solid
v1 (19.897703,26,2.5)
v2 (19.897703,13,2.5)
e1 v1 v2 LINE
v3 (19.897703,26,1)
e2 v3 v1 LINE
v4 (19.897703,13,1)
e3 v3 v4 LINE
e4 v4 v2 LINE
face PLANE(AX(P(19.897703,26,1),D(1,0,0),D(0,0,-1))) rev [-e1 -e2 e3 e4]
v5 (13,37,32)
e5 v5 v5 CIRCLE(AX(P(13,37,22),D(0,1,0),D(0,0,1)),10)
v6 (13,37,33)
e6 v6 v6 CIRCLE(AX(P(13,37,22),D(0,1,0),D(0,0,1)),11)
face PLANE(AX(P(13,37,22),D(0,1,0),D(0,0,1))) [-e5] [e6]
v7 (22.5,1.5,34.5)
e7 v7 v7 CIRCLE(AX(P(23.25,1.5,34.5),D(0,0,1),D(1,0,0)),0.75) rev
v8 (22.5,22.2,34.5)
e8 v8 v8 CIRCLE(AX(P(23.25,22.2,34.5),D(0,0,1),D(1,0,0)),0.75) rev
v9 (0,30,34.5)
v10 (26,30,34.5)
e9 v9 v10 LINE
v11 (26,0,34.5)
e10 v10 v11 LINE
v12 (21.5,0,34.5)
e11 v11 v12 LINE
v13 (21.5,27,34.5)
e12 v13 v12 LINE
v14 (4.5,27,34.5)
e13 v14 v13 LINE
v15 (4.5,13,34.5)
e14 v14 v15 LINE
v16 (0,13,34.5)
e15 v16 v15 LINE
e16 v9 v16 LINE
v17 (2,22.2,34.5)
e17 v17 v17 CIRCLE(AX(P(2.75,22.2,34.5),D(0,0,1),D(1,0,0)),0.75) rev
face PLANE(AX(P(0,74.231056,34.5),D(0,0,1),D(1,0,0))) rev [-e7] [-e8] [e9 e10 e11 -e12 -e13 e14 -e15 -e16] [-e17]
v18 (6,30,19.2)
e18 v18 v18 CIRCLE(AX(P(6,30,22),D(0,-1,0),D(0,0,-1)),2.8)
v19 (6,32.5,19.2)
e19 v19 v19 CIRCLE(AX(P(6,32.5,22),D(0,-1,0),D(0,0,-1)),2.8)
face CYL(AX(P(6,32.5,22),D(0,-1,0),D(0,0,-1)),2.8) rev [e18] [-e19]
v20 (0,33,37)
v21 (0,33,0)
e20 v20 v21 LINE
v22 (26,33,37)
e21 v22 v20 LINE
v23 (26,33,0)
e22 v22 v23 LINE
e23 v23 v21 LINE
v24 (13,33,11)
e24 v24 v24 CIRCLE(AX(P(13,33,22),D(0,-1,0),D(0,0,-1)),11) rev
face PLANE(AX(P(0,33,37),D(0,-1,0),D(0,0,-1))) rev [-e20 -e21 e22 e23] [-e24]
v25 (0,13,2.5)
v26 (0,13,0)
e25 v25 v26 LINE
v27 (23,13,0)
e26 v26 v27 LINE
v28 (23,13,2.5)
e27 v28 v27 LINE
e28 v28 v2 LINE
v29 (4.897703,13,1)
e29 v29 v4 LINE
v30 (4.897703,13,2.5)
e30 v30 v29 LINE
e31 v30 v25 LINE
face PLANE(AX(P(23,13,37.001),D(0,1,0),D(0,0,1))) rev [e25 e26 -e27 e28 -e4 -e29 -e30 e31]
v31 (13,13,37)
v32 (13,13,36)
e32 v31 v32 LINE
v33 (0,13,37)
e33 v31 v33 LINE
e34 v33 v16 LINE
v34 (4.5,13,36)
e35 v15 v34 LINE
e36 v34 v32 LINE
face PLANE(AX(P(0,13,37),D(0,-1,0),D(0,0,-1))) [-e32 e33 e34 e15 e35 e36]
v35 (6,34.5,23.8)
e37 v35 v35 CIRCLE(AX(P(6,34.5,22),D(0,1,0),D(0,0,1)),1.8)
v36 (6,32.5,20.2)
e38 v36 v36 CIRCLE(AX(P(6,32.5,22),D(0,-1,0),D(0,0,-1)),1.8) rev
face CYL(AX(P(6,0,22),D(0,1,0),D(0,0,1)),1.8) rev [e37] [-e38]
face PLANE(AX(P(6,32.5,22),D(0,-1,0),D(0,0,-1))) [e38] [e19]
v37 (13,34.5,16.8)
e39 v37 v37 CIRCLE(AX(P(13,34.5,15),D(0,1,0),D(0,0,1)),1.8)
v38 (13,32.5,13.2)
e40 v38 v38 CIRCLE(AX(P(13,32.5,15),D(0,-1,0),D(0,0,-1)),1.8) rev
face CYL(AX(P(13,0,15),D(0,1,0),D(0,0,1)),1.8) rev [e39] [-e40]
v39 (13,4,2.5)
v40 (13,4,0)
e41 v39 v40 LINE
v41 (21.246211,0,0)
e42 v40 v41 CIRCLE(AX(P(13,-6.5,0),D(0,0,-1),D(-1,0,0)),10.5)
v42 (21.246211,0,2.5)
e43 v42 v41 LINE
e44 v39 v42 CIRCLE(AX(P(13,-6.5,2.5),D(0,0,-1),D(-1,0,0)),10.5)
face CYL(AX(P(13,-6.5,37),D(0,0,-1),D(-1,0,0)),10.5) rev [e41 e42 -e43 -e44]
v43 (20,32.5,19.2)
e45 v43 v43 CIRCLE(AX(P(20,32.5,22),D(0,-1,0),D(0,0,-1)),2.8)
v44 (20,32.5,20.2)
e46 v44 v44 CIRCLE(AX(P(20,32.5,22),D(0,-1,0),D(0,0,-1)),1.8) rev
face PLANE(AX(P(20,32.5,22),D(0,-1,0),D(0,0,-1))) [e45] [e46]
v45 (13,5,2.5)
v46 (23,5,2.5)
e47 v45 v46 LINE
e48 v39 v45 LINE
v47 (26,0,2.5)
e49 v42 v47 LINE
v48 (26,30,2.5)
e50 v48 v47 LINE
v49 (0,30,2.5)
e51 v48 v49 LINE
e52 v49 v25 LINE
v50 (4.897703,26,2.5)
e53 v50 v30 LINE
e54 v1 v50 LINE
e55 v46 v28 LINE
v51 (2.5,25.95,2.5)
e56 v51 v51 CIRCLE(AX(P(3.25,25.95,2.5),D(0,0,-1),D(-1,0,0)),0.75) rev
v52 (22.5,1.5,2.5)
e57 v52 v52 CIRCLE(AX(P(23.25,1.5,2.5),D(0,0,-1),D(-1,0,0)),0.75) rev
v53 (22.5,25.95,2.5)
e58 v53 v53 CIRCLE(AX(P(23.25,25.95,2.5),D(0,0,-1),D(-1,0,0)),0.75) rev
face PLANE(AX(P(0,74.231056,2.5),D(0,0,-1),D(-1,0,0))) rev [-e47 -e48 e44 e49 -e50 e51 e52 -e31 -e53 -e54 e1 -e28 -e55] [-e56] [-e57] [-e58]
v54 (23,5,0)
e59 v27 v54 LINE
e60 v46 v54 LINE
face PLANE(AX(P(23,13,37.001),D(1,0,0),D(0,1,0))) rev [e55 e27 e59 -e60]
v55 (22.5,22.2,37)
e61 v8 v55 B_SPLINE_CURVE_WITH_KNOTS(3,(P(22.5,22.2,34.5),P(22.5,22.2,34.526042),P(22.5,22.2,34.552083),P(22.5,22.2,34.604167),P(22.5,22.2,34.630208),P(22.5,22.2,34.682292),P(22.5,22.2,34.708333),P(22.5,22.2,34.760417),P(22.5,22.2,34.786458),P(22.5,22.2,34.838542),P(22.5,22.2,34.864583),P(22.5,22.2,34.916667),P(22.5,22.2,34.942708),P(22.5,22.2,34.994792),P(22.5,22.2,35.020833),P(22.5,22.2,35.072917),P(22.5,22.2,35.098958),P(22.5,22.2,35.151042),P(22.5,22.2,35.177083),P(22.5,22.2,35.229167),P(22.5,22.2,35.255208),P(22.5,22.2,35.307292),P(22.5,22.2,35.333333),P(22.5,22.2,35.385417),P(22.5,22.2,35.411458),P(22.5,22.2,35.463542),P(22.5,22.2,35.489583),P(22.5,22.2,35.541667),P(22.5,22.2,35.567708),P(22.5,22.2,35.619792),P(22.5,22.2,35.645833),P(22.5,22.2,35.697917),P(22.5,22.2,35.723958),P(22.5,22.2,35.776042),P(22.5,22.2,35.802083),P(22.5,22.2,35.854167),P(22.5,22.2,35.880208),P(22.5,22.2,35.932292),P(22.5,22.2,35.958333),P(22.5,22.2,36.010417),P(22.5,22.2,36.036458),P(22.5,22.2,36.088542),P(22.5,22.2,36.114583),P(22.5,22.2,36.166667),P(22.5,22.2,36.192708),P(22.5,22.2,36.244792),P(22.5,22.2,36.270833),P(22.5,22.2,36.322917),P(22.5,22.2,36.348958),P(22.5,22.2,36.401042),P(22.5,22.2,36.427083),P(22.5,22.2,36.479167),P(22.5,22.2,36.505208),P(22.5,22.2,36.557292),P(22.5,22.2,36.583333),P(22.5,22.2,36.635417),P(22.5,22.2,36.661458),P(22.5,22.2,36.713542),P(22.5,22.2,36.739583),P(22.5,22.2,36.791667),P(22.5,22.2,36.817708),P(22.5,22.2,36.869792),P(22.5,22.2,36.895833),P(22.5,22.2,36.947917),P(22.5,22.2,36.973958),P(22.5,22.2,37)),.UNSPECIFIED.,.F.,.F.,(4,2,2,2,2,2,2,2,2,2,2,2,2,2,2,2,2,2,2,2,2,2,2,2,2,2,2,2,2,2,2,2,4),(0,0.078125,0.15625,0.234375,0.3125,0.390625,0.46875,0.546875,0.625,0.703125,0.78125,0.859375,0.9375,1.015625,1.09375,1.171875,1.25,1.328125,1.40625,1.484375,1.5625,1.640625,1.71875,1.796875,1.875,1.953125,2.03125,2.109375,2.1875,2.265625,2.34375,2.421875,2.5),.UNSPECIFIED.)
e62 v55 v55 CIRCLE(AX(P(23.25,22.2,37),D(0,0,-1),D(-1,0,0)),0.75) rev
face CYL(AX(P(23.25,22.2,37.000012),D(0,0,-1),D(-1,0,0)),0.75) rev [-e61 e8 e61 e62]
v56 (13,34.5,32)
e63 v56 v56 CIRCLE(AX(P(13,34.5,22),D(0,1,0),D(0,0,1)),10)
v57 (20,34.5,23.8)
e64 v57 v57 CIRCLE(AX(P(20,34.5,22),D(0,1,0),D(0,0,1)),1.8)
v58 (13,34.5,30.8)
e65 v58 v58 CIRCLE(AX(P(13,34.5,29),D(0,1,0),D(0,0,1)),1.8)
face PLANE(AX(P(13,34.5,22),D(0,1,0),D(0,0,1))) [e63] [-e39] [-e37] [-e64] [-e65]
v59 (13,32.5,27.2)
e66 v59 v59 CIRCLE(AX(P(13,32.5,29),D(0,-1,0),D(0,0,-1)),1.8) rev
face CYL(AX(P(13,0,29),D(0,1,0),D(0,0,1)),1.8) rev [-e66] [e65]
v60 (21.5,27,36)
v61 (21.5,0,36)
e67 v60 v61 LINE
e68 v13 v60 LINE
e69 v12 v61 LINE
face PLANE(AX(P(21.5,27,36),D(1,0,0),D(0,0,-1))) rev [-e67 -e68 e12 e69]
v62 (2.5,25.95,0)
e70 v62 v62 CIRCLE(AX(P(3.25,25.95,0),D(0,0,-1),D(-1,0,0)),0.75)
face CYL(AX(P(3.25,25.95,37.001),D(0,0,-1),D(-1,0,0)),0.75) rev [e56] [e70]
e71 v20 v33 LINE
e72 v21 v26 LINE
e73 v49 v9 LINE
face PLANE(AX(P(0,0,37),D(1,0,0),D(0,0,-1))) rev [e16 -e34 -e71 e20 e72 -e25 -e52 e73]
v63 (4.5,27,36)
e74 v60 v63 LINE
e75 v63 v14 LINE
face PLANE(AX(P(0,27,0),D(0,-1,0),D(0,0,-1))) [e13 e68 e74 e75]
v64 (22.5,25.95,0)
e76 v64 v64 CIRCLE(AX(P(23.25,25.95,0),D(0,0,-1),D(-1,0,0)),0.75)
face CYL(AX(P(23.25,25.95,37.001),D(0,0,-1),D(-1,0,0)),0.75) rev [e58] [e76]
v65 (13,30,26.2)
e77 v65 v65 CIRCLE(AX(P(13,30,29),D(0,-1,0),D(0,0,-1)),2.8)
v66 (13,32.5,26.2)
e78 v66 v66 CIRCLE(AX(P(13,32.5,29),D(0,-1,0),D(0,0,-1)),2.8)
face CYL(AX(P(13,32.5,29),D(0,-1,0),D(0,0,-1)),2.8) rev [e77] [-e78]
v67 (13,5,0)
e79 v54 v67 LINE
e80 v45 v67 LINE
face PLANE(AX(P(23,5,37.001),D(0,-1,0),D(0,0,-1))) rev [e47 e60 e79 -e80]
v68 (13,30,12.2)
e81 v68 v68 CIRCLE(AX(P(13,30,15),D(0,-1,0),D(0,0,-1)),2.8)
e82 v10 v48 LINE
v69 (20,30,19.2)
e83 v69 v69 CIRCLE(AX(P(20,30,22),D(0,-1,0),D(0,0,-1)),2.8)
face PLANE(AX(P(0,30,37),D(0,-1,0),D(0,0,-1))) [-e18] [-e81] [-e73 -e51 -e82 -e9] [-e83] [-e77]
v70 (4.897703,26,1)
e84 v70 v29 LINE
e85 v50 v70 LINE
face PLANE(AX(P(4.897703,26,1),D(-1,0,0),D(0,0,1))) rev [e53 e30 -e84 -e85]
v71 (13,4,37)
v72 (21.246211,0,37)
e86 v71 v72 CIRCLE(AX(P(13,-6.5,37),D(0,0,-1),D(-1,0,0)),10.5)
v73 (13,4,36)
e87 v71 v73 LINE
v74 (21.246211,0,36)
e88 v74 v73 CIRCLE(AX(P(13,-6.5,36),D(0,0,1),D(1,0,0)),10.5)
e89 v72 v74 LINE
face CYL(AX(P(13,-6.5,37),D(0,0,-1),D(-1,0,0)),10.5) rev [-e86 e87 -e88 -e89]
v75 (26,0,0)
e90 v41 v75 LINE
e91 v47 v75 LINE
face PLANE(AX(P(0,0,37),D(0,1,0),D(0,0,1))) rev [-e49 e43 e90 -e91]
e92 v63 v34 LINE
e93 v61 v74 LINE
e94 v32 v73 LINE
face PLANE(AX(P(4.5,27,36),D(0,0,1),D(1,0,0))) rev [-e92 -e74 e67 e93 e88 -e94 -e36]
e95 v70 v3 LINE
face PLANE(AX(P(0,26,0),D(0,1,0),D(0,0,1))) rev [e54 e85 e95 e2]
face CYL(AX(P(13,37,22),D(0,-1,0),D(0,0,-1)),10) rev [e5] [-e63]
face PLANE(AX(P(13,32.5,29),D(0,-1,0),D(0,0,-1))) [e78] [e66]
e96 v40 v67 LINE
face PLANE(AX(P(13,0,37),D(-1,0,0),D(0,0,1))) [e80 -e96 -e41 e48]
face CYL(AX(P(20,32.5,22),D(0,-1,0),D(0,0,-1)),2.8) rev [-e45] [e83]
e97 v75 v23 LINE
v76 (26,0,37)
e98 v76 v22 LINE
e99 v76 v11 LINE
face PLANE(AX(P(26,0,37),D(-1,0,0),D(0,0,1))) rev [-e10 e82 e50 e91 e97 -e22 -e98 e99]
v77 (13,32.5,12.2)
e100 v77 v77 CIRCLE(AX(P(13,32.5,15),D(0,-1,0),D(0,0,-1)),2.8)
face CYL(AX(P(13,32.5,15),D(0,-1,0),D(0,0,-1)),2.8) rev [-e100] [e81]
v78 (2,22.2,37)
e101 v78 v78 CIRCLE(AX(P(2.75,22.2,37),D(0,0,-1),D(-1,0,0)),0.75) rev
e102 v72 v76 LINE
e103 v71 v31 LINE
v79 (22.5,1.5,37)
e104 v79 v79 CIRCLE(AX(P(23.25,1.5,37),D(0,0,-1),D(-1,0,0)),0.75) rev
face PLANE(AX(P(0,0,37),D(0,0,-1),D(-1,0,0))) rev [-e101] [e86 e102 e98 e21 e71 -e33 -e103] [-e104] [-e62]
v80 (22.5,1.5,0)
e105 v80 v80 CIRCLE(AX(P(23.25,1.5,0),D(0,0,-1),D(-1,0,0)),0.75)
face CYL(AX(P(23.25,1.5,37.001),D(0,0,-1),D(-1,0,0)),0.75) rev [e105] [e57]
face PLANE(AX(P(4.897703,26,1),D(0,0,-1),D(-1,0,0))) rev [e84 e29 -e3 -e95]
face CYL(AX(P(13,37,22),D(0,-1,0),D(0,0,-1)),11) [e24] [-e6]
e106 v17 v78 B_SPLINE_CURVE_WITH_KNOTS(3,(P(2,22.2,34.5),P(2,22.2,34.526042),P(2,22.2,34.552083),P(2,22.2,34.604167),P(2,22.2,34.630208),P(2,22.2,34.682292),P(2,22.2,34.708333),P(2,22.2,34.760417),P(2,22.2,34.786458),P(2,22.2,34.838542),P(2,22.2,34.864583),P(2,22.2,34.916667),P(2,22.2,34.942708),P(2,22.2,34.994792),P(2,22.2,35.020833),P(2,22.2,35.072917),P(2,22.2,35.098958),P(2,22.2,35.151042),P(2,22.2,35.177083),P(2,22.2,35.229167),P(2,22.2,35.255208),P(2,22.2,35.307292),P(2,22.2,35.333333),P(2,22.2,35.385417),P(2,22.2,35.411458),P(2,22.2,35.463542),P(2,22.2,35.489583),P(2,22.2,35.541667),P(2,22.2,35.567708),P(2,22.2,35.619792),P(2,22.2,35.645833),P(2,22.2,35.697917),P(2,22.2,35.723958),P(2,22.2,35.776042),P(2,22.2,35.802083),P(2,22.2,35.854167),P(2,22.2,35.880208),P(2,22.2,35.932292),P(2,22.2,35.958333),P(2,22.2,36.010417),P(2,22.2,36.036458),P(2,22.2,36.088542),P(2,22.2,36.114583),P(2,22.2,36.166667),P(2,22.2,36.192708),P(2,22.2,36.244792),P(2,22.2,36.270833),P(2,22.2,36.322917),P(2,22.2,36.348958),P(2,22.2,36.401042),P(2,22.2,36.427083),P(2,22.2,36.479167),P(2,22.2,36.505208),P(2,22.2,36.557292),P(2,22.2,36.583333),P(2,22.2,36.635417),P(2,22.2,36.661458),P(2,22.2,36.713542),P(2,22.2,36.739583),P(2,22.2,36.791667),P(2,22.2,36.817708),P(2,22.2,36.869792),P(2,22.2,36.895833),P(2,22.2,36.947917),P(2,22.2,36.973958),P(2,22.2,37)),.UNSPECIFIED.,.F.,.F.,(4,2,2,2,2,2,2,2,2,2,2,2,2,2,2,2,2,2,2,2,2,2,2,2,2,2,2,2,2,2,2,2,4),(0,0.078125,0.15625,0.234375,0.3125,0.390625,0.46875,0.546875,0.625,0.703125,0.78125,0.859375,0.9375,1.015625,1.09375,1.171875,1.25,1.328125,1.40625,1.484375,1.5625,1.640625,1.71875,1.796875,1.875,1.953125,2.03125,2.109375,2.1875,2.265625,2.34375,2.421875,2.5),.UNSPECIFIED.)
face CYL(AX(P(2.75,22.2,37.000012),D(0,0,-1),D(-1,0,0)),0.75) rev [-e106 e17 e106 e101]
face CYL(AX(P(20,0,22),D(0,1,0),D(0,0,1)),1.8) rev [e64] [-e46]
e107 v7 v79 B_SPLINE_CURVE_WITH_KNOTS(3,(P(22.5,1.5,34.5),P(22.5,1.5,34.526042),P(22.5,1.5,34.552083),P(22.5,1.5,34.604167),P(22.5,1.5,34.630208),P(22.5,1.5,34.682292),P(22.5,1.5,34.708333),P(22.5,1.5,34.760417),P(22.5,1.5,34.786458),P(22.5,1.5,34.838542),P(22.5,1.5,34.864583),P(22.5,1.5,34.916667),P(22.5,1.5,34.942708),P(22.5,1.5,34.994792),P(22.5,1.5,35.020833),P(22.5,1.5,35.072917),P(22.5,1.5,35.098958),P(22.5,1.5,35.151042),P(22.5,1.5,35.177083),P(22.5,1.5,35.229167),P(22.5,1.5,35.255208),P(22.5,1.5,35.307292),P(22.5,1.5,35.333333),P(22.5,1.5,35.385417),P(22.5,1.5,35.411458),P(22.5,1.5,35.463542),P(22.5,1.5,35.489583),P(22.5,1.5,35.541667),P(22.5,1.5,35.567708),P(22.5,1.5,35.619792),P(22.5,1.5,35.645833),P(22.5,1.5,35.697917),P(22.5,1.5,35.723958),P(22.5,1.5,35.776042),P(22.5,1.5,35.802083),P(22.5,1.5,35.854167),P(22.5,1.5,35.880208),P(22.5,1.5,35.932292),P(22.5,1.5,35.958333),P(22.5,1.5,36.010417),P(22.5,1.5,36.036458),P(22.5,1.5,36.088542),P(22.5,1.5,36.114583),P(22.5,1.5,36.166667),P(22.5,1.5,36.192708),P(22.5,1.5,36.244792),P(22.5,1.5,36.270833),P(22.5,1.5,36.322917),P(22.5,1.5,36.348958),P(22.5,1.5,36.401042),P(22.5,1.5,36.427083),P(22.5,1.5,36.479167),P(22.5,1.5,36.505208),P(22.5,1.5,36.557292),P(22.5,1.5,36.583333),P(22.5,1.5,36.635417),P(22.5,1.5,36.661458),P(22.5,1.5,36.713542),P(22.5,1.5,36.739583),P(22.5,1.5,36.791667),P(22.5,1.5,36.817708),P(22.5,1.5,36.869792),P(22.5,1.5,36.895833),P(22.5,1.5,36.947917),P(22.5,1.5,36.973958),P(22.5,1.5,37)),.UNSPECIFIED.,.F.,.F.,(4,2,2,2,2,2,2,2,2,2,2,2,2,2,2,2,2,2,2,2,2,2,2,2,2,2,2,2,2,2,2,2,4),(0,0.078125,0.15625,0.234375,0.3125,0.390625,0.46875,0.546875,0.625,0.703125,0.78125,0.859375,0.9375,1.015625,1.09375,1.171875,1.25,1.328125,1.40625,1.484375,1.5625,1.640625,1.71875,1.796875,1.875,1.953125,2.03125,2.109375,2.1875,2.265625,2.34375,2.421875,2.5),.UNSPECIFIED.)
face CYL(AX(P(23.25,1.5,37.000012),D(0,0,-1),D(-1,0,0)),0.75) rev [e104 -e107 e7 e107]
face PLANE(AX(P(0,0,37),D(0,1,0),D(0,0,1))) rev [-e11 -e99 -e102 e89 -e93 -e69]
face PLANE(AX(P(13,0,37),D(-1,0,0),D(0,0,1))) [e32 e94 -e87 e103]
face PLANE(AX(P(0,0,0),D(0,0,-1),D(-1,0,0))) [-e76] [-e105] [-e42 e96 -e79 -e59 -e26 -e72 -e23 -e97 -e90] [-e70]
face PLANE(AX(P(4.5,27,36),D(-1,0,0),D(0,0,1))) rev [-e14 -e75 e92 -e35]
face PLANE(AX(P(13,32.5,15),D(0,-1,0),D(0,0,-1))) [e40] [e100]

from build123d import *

# Parameters (mm, degrees)
SKETCH_1_W                      = 26
SKETCH_1_H                      = 33
EXTRUDE_1_DEPTH                 = 37
SKETCH_3_W                      = 26
SKETCH_3_H                      = 32
CUT_EXTRUDE_1_DEPTH             = 30
CUT_EXTRUDE_2_REACH             = 57.982
SKETCH_2_R                      = 0.75
CUT_EXTRUDE_2_DIRECTION_2_DEPTH = 56.982140009
CUT_EXTRUDE_3_REACH             = 57.982
SKETCH_4_R                      = 0.75
SKETCH_5_W                      = 17
SKETCH_5_H                      = 1.5
CUT_EXTRUDE_4_DEPTH             = 27
CUT_EXTRUDE_5_REACH             = 57.982
SKETCH_6_W                      = 20
SKETCH_6_H                      = 8
CUT_EXTRUDE_START               = -37
CUT_EXTRUDE_6_OUTLINE_R         = 0.75
CUT_EXTRUDE_6_DEPTH             = 37
SKETCH_8_W                      = 15
SKETCH_8_H                      = 1.5
CUT_EXTRUDE_7_DEPTH             = 13
SKETCH_9_R                      = 11
SKETCH_9_R_2                    = 10
EXTRUDE_2_DEPTH                 = 4
SKETCH_12_R                     = 10
EXTRUDE_3_DEPTH                 = 1.5
CUT_EXTRUDE_8_DEPTH             = 56.982140009
CUT_EXTRUDE_8_DEPTH_BACK        = 56.982140009
SKETCH_10_R                     = 1.8
SKETCH_11_R                     = 2.8
CUT_EXTRUDE_9_DEPTH             = 2.5


# Read off the part's stored shape, not the designer's step: 切除-拉伸6
with BuildPart() as part:
    # 草图1 → 凸台-拉伸1 (new body)
    with BuildSketch(Plane.XY):
        with Locations((13, 16.5)):
            Rectangle(SKETCH_1_W, SKETCH_1_H)
    extrude(amount=EXTRUDE_1_DEPTH)

    # 草图3 → 切除-拉伸1 (cut)
    with BuildSketch(Plane.XZ):
        with Locations((13, 18.5)):
            Rectangle(SKETCH_3_W, SKETCH_3_H)
    extrude(amount=-CUT_EXTRUDE_1_DEPTH, mode=Mode.SUBTRACT)

    # 草图2 → 切除-拉伸2 (cut, up to next)
    with BuildSketch(Plane.XY.offset(37), mode=Mode.PRIVATE) as cut_extrude_2_sk1:
        with Locations(Location((2.75, 1.5, 0), (0, 0, 180))):
            Circle(SKETCH_2_R)
    cut_extrude_2_tool1 = extrude(cut_extrude_2_sk1.sketch, amount=-CUT_EXTRUDE_2_REACH, mode=Mode.PRIVATE) & part.part
    # 草图2 → 切除-拉伸2 (cut, up to next)
    with BuildSketch(Plane.XY.offset(37), mode=Mode.PRIVATE) as cut_extrude_2_sk2:
        with Locations(Location((23.25, 1.5, 0), (0, 0, 180))):
            Circle(SKETCH_2_R)
    cut_extrude_2_tool2 = extrude(cut_extrude_2_sk2.sketch, amount=-CUT_EXTRUDE_2_REACH, mode=Mode.PRIVATE) & part.part
    # 草图2 → 切除-拉伸2 (cut, up to next)
    with BuildSketch(Plane.XY.offset(37), mode=Mode.PRIVATE) as cut_extrude_2_sk3:
        with Locations(Location((23.25, 22.2, 0), (0, 0, 180))):
            Circle(SKETCH_2_R)
    cut_extrude_2_tool3 = extrude(cut_extrude_2_sk3.sketch, amount=-CUT_EXTRUDE_2_REACH, mode=Mode.PRIVATE) & part.part
    # 草图2 → 切除-拉伸2 (cut, up to next)
    with BuildSketch(Plane.XY.offset(37), mode=Mode.PRIVATE) as cut_extrude_2_sk4:
        with Locations(Location((2.75, 22.2, 0), (0, 0, 180))):
            Circle(SKETCH_2_R)
    cut_extrude_2_tool4 = extrude(cut_extrude_2_sk4.sketch, amount=-CUT_EXTRUDE_2_REACH, mode=Mode.PRIVATE) & part.part
    add(cut_extrude_2_tool1.solids().sort_by_distance((2.75, 1.5, 37))[0], mode=Mode.SUBTRACT)
    add(cut_extrude_2_tool2.solids().sort_by_distance((23.25, 1.5, 37))[0], mode=Mode.SUBTRACT)
    add(cut_extrude_2_tool3.solids().sort_by_distance((23.25, 22.2, 37))[0], mode=Mode.SUBTRACT)
    add(cut_extrude_2_tool4.solids().sort_by_distance((2.75, 22.2, 37))[0], mode=Mode.SUBTRACT)

    # 草图2 → 切除-拉伸2 direction 2 (cut)
    with BuildSketch(Plane.XY.offset(37)):
        with Locations(Location((2.75, 1.5, 0), (0, 0, 180))):
            Circle(SKETCH_2_R)
        with Locations(Location((23.25, 1.5, 0), (0, 0, 180))):
            Circle(SKETCH_2_R)
        with Locations(Location((23.25, 22.2, 0), (0, 0, 180))):
            Circle(SKETCH_2_R)
        with Locations(Location((2.75, 22.2, 0), (0, 0, 180))):
            Circle(SKETCH_2_R)
    extrude(amount=CUT_EXTRUDE_2_DIRECTION_2_DEPTH, mode=Mode.SUBTRACT)

    # 草图4 → 切除-拉伸3 (cut, up to next)
    with BuildSketch(Plane(origin=(0, 0, 0), x_dir=(-1, 0, 0), z_dir=(0, 0, -1)), mode=Mode.PRIVATE) as cut_extrude_3_sk1:
        with Locations((-2.75, 1.5)):
            Circle(SKETCH_4_R)
    cut_extrude_3_tool1 = extrude(cut_extrude_3_sk1.sketch, amount=-CUT_EXTRUDE_3_REACH, mode=Mode.PRIVATE) & part.part
    # 草图4 → 切除-拉伸3 (cut, up to next)
    with BuildSketch(Plane(origin=(0, 0, 0), x_dir=(-1, 0, 0), z_dir=(0, 0, -1)), mode=Mode.PRIVATE) as cut_extrude_3_sk2:
        with Locations((-23.25, 1.5)):
            Circle(SKETCH_4_R)
    cut_extrude_3_tool2 = extrude(cut_extrude_3_sk2.sketch, amount=-CUT_EXTRUDE_3_REACH, mode=Mode.PRIVATE) & part.part
    # 草图4 → 切除-拉伸3 (cut, up to next)
    with BuildSketch(Plane(origin=(0, 0, 0), x_dir=(-1, 0, 0), z_dir=(0, 0, -1)), mode=Mode.PRIVATE) as cut_extrude_3_sk3:
        with Locations((-23.25, 25.95)):
            Circle(SKETCH_4_R)
    cut_extrude_3_tool3 = extrude(cut_extrude_3_sk3.sketch, amount=-CUT_EXTRUDE_3_REACH, mode=Mode.PRIVATE) & part.part
    # 草图4 → 切除-拉伸3 (cut, up to next)
    with BuildSketch(Plane(origin=(0, 0, 0), x_dir=(-1, 0, 0), z_dir=(0, 0, -1)), mode=Mode.PRIVATE) as cut_extrude_3_sk4:
        with Locations((-3.25, 25.95)):
            Circle(SKETCH_4_R)
    cut_extrude_3_tool4 = extrude(cut_extrude_3_sk4.sketch, amount=-CUT_EXTRUDE_3_REACH, mode=Mode.PRIVATE) & part.part
    add(cut_extrude_3_tool1.solids().sort_by_distance((2.75, 1.5, 0))[0], mode=Mode.SUBTRACT)
    add(cut_extrude_3_tool2.solids().sort_by_distance((23.25, 1.5, 0))[0], mode=Mode.SUBTRACT)
    add(cut_extrude_3_tool3.solids().sort_by_distance((23.25, 25.95, 0))[0], mode=Mode.SUBTRACT)
    add(cut_extrude_3_tool4.solids().sort_by_distance((3.25, 25.95, 0))[0], mode=Mode.SUBTRACT)

    # 草图5 → 切除-拉伸4 (cut)
    with BuildSketch(Plane.XZ):
        with Locations((13, 35.25)):
            Rectangle(SKETCH_5_W, SKETCH_5_H)
    extrude(amount=-CUT_EXTRUDE_4_DEPTH, mode=Mode.SUBTRACT)

    # 草图6 → 切除-拉伸5 (cut, up to next)
    with BuildSketch(Plane(origin=(0, 0, 0), x_dir=(-1, 0, 0), z_dir=(0, 0, -1)), mode=Mode.PRIVATE) as cut_extrude_5_sk1:
        with Locations((-13, 9)):
            Rectangle(SKETCH_6_W, SKETCH_6_H)
    cut_extrude_5_tool1 = extrude(cut_extrude_5_sk1.sketch, amount=-CUT_EXTRUDE_5_REACH, mode=Mode.PRIVATE) & part.part
    add(cut_extrude_5_tool1.solids().sort_by_distance((13, 9, 0))[0], mode=Mode.SUBTRACT)

    # 切除-拉伸6 outline → 切除-拉伸6 (cut)
    with BuildSketch(Plane(origin=(0, 0, 0), x_dir=(-1, 0, 0), z_dir=(0, 0, -1)).offset(CUT_EXTRUDE_START)):
        with BuildLine():
            Line((0, 0), (0, 13))
            Line((0, 13), (-13, 13))
            Line((-13, 13), (-13, 4))
            ThreePointArc((-13, 4), (-17.582575695, 2.947221814), (-21.246211251, 0))
            Line((-21.246211251, 0), (0, 0))
        make_face()
        with Locations((-2.75, 1.5)):
            Circle(CUT_EXTRUDE_6_OUTLINE_R, mode=Mode.SUBTRACT)
    extrude(amount=CUT_EXTRUDE_6_DEPTH, mode=Mode.SUBTRACT)

    # 草图8 → 切除-拉伸7 (cut)
    with BuildSketch(Plane.XZ.offset(-13)):
        with Locations((12.397702636, 1.75)):
            Rectangle(SKETCH_8_W, SKETCH_8_H)
    extrude(amount=-CUT_EXTRUDE_7_DEPTH, mode=Mode.SUBTRACT)

    # 草图9 → 凸台-拉伸2 (add)
    with BuildSketch(Plane(origin=(0, 33, 0), x_dir=(1, 0, 0), z_dir=(0, 1, 0))):
        with Locations(Location((13, -22, 0), (0, 0, 90))):
            Circle(SKETCH_9_R)
        with Locations(Location((13, -22, 0), (0, 0, 270))):
            Circle(SKETCH_9_R_2, mode=Mode.SUBTRACT)
    extrude(amount=EXTRUDE_2_DEPTH)

    # 草图12 → 凸台-拉伸3 (add)
    with BuildSketch(Plane(origin=(0, 33, 0), x_dir=(1, 0, 0), z_dir=(0, 1, 0))):
        with Locations(Location((13, -22, 0), (0, 0, 270))):
            Circle(SKETCH_12_R)
    extrude(amount=EXTRUDE_3_DEPTH)

    # 草图10 → 切除-拉伸8 (cut, two sides: drawn at the far end of the back side and taken through both)
    with BuildSketch(Plane(origin=(0, 33, 0), x_dir=(1, 0, 0), z_dir=(0, 1, 0)).offset(-CUT_EXTRUDE_8_DEPTH_BACK)):
        with Locations(Location((13, -15, 0), (0, 0, 270))):
            Circle(SKETCH_10_R)
        with Locations(Location((20, -22, 0), (0, 0, 270))):
            Circle(SKETCH_10_R)
        with Locations(Location((13, -29, 0), (0, 0, 270))):
            Circle(SKETCH_10_R)
        with Locations(Location((6, -22, 0), (0, 0, 270))):
            Circle(SKETCH_10_R)
    extrude(amount=CUT_EXTRUDE_8_DEPTH + CUT_EXTRUDE_8_DEPTH_BACK, mode=Mode.SUBTRACT)

    # 草图11 → 切除-拉伸9 (cut)
    with BuildSketch(Plane.XZ.offset(-30)):
        with Locations(Location((6, 22, 0), (0, 0, 270))):
            Circle(SKETCH_11_R)
        with Locations(Location((13, 29, 0), (0, 0, 270))):
            Circle(SKETCH_11_R)
        with Locations(Location((20, 22, 0), (0, 0, 270))):
            Circle(SKETCH_11_R)
        with Locations(Location((13, 15, 0), (0, 0, 270))):
            Circle(SKETCH_11_R)
    extrude(amount=-CUT_EXTRUDE_9_DEPTH, mode=Mode.SUBTRACT)


solid = part.part
